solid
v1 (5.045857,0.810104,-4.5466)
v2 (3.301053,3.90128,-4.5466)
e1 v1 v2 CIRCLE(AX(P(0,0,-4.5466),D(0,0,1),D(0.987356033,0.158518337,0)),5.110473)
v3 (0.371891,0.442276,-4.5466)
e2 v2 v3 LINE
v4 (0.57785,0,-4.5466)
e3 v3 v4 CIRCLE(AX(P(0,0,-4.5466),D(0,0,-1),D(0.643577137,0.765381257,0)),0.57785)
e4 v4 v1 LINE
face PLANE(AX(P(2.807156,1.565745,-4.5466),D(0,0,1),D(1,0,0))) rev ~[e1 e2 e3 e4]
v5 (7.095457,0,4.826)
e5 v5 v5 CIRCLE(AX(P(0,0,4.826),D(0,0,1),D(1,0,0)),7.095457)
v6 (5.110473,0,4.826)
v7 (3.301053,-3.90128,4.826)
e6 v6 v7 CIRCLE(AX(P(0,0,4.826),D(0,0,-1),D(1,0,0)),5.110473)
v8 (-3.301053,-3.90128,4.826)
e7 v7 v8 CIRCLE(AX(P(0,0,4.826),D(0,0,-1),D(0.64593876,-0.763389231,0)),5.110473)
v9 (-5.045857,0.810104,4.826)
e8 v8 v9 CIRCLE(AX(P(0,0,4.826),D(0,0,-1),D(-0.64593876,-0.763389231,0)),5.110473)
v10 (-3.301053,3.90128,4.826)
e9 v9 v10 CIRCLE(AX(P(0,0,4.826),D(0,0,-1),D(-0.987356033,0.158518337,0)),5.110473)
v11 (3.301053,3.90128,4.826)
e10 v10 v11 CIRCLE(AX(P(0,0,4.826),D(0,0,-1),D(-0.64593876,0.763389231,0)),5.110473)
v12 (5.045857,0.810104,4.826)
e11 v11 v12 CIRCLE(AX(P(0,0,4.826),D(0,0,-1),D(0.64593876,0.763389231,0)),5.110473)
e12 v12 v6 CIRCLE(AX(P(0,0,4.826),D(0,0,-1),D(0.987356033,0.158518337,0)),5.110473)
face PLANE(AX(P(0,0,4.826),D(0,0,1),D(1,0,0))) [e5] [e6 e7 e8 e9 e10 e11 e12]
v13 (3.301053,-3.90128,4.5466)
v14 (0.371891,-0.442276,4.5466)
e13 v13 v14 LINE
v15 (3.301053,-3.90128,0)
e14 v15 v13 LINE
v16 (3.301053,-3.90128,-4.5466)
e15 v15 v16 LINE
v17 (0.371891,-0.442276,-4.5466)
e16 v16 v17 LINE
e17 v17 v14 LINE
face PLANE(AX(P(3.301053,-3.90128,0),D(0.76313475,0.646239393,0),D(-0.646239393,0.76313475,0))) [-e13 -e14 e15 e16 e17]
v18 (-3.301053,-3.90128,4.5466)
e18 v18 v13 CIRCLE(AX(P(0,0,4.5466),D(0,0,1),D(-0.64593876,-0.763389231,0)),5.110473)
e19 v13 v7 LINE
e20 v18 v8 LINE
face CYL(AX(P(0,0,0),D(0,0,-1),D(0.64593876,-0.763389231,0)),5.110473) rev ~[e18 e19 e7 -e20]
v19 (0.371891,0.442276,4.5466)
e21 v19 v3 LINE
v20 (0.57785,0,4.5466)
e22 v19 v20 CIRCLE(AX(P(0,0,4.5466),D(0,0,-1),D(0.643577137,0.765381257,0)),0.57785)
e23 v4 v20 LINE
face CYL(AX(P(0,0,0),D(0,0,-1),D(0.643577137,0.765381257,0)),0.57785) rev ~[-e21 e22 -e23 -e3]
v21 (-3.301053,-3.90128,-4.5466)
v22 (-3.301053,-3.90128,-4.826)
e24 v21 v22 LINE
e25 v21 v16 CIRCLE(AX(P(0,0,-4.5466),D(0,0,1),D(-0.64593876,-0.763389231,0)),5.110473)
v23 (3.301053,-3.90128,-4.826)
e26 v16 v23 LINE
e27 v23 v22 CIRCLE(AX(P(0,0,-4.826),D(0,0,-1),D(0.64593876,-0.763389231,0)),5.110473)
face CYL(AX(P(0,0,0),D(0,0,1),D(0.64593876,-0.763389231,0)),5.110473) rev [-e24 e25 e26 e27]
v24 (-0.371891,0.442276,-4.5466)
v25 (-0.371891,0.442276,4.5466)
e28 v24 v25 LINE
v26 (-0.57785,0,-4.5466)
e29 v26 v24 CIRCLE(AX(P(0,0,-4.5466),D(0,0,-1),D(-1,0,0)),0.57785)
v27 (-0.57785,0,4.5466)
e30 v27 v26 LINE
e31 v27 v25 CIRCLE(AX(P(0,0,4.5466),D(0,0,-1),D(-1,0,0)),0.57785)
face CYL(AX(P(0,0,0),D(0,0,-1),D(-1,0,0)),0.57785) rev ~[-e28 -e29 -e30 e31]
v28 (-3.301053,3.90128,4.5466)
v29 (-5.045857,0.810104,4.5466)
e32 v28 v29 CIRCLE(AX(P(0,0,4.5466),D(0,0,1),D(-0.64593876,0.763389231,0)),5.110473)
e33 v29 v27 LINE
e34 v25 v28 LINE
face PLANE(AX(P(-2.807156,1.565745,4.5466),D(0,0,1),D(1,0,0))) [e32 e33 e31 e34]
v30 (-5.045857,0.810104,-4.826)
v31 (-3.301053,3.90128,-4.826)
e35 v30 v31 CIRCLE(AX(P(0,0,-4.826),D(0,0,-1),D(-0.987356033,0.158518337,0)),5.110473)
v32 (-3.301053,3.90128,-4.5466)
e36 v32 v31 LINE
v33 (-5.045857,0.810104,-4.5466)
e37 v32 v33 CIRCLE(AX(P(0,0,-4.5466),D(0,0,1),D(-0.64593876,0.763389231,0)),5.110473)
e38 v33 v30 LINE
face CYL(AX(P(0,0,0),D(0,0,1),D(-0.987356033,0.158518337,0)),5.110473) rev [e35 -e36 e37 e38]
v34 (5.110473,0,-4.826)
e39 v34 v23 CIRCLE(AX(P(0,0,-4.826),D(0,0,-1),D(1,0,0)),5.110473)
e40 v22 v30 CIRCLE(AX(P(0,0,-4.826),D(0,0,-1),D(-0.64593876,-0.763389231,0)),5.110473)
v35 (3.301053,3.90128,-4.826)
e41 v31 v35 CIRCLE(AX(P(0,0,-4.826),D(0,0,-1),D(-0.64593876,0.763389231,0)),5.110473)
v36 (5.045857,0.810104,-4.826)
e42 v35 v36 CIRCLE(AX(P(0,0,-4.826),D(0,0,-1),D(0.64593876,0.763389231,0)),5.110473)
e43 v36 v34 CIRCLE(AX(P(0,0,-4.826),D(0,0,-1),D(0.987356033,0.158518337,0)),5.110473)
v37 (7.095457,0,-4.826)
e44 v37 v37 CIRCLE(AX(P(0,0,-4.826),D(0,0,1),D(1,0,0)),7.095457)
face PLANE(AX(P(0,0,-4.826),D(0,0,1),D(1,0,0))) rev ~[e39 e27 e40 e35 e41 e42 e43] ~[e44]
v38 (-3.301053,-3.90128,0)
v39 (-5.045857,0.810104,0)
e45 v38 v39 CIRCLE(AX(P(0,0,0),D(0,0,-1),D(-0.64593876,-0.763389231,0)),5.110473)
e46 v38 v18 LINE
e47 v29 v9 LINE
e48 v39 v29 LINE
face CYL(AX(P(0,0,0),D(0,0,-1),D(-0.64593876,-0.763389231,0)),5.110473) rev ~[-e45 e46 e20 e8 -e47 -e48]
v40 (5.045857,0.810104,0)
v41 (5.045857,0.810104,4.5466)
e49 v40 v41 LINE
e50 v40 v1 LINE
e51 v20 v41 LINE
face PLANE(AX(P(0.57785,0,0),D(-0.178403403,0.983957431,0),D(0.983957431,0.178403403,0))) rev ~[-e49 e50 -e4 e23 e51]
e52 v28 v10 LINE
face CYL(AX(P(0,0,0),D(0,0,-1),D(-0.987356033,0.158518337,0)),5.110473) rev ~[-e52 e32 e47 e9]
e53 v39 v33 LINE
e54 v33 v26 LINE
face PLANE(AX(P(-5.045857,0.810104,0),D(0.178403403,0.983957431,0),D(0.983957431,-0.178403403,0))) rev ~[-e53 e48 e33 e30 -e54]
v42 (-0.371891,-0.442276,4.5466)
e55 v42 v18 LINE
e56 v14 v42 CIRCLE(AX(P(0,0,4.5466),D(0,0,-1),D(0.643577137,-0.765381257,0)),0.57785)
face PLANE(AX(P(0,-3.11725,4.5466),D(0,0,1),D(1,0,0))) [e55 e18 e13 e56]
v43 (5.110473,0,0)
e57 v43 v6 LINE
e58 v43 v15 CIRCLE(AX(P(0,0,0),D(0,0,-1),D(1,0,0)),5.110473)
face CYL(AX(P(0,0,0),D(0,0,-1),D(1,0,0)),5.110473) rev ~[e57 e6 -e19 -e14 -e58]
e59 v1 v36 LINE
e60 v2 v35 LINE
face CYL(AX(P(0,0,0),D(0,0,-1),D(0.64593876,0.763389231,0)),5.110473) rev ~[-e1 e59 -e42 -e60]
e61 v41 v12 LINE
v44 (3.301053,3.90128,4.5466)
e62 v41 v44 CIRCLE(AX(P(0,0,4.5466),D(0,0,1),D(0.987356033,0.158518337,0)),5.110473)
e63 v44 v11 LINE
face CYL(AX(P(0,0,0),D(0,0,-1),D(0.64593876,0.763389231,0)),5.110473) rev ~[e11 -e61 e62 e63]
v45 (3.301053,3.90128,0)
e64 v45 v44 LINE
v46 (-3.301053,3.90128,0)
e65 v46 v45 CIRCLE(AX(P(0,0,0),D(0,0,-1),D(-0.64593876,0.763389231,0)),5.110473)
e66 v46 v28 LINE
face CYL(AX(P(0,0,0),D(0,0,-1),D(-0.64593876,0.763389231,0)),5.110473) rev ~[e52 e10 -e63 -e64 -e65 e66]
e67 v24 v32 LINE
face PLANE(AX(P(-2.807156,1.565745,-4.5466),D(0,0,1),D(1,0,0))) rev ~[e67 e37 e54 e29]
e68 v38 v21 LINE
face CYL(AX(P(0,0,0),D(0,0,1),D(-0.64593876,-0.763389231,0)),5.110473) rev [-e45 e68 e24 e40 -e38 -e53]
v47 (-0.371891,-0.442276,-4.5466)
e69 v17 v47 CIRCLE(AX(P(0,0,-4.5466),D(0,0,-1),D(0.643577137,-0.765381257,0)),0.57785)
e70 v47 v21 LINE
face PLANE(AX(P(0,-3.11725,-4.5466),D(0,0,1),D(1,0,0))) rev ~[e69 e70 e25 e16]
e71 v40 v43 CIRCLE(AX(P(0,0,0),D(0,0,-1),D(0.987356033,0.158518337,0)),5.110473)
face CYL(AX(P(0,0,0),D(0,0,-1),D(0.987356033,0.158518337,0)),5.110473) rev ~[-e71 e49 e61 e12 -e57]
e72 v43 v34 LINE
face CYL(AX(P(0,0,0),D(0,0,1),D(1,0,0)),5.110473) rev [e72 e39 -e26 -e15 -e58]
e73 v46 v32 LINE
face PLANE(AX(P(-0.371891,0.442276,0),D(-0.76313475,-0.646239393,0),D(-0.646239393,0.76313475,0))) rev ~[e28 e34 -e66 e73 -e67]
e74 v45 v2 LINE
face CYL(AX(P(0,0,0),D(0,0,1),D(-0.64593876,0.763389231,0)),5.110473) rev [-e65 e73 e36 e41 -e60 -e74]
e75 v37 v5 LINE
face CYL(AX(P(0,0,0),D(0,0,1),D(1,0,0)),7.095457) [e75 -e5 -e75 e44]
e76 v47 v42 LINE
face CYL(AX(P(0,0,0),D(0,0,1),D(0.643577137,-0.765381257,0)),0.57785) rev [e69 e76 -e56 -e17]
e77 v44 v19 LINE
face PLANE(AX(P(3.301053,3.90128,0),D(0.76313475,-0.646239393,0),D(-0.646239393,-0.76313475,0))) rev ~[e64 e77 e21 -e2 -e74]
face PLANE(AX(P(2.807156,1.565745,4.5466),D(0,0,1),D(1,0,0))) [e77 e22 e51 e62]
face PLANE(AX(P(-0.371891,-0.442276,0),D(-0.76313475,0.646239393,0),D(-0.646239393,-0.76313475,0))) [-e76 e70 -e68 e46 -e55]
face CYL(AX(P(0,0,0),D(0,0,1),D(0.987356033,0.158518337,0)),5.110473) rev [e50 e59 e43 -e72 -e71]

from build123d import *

# Parameters (mm, degrees)
F0_R     = 7.0954565199
F1_DEPTH = 4.826
F2_DEPTH = 4.5466


# Not quite as in the source:
# - the program builds the solid bodies; features that only make, move or delete a surface that nothing else refers to are left out


with BuildPart() as f1:
    # F0 (on Top) → F1 (new body, symmetric)
    with BuildSketch(Plane.XY):
        Circle(F0_R)
        with BuildLine():
            ThreePointArc((3.3010527039, 3.9012801832), (4.4504568739, 2.5120449112), (5.045856518, 0.8101037104))
            ThreePointArc((5.045856518, 0.8101037104), (5.0942933944, 0.4063383238), (5.1104731701, 0))
            ThreePointArc((5.1104731701, 0), (4.6361016651, -2.1502319347), (3.3010527039, -3.9012801832))
            ThreePointArc((3.3010527039, -3.9012801832), (0, -5.1104731701), (-3.3010527039, -3.9012801832))
            ThreePointArc((-3.3010527039, -3.9012801832), (-4.7923906287, -1.7748036747), (-5.045856518, 0.8101037104))
            ThreePointArc((-5.045856518, 0.8101037104), (-4.4504568739, 2.5120449112), (-3.3010527039, 3.9012801832))
            ThreePointArc((-3.3010527039, 3.9012801832), (0, 5.1104731701), (3.3010527039, 3.9012801832))
        make_face(mode=Mode.SUBTRACT)
    extrude(amount=F1_DEPTH, both=True)

    # F0 (on Top) → F2 (join, symmetric)
    with BuildSketch(Plane.XY):
        with BuildLine():
            ThreePointArc((0.3718910489, 0.4422755592), (0.5238357878, 0.243939931), (0.57785, 0))
            Line((0.57785, 0), (5.045856518, 0.8101037104))
            ThreePointArc((5.045856518, 0.8101037104), (4.4504568739, 2.5120449112), (3.3010527039, 3.9012801832))
            Line((3.3010527039, 3.9012801832), (0.3718910489, 0.4422755592))
        make_face()
        with BuildLine():
            ThreePointArc((-0.57785, 0), (-0.5238357878, 0.243939931), (-0.3718910489, 0.4422755592))
            Line((-0.3718910489, 0.4422755592), (-3.3010527039, 3.9012801832))
            ThreePointArc((-3.3010527039, 3.9012801832), (-4.4504568739, 2.5120449112), (-5.045856518, 0.8101037104))
            Line((-5.045856518, 0.8101037104), (-0.57785, 0))
        make_face()
        with BuildLine():
            Line((3.3010527039, -3.9012801832), (0.3718910489, -0.4422755592))
            ThreePointArc((0.3718910489, -0.4422755592), (0, -0.57785), (-0.3718910489, -0.4422755592))
            Line((-0.3718910489, -0.4422755592), (-3.3010527039, -3.9012801832))
            ThreePointArc((-3.3010527039, -3.9012801832), (0, -5.1104731701), (3.3010527039, -3.9012801832))
        make_face()
    extrude(amount=F2_DEPTH, both=True)


solid = f1.part
